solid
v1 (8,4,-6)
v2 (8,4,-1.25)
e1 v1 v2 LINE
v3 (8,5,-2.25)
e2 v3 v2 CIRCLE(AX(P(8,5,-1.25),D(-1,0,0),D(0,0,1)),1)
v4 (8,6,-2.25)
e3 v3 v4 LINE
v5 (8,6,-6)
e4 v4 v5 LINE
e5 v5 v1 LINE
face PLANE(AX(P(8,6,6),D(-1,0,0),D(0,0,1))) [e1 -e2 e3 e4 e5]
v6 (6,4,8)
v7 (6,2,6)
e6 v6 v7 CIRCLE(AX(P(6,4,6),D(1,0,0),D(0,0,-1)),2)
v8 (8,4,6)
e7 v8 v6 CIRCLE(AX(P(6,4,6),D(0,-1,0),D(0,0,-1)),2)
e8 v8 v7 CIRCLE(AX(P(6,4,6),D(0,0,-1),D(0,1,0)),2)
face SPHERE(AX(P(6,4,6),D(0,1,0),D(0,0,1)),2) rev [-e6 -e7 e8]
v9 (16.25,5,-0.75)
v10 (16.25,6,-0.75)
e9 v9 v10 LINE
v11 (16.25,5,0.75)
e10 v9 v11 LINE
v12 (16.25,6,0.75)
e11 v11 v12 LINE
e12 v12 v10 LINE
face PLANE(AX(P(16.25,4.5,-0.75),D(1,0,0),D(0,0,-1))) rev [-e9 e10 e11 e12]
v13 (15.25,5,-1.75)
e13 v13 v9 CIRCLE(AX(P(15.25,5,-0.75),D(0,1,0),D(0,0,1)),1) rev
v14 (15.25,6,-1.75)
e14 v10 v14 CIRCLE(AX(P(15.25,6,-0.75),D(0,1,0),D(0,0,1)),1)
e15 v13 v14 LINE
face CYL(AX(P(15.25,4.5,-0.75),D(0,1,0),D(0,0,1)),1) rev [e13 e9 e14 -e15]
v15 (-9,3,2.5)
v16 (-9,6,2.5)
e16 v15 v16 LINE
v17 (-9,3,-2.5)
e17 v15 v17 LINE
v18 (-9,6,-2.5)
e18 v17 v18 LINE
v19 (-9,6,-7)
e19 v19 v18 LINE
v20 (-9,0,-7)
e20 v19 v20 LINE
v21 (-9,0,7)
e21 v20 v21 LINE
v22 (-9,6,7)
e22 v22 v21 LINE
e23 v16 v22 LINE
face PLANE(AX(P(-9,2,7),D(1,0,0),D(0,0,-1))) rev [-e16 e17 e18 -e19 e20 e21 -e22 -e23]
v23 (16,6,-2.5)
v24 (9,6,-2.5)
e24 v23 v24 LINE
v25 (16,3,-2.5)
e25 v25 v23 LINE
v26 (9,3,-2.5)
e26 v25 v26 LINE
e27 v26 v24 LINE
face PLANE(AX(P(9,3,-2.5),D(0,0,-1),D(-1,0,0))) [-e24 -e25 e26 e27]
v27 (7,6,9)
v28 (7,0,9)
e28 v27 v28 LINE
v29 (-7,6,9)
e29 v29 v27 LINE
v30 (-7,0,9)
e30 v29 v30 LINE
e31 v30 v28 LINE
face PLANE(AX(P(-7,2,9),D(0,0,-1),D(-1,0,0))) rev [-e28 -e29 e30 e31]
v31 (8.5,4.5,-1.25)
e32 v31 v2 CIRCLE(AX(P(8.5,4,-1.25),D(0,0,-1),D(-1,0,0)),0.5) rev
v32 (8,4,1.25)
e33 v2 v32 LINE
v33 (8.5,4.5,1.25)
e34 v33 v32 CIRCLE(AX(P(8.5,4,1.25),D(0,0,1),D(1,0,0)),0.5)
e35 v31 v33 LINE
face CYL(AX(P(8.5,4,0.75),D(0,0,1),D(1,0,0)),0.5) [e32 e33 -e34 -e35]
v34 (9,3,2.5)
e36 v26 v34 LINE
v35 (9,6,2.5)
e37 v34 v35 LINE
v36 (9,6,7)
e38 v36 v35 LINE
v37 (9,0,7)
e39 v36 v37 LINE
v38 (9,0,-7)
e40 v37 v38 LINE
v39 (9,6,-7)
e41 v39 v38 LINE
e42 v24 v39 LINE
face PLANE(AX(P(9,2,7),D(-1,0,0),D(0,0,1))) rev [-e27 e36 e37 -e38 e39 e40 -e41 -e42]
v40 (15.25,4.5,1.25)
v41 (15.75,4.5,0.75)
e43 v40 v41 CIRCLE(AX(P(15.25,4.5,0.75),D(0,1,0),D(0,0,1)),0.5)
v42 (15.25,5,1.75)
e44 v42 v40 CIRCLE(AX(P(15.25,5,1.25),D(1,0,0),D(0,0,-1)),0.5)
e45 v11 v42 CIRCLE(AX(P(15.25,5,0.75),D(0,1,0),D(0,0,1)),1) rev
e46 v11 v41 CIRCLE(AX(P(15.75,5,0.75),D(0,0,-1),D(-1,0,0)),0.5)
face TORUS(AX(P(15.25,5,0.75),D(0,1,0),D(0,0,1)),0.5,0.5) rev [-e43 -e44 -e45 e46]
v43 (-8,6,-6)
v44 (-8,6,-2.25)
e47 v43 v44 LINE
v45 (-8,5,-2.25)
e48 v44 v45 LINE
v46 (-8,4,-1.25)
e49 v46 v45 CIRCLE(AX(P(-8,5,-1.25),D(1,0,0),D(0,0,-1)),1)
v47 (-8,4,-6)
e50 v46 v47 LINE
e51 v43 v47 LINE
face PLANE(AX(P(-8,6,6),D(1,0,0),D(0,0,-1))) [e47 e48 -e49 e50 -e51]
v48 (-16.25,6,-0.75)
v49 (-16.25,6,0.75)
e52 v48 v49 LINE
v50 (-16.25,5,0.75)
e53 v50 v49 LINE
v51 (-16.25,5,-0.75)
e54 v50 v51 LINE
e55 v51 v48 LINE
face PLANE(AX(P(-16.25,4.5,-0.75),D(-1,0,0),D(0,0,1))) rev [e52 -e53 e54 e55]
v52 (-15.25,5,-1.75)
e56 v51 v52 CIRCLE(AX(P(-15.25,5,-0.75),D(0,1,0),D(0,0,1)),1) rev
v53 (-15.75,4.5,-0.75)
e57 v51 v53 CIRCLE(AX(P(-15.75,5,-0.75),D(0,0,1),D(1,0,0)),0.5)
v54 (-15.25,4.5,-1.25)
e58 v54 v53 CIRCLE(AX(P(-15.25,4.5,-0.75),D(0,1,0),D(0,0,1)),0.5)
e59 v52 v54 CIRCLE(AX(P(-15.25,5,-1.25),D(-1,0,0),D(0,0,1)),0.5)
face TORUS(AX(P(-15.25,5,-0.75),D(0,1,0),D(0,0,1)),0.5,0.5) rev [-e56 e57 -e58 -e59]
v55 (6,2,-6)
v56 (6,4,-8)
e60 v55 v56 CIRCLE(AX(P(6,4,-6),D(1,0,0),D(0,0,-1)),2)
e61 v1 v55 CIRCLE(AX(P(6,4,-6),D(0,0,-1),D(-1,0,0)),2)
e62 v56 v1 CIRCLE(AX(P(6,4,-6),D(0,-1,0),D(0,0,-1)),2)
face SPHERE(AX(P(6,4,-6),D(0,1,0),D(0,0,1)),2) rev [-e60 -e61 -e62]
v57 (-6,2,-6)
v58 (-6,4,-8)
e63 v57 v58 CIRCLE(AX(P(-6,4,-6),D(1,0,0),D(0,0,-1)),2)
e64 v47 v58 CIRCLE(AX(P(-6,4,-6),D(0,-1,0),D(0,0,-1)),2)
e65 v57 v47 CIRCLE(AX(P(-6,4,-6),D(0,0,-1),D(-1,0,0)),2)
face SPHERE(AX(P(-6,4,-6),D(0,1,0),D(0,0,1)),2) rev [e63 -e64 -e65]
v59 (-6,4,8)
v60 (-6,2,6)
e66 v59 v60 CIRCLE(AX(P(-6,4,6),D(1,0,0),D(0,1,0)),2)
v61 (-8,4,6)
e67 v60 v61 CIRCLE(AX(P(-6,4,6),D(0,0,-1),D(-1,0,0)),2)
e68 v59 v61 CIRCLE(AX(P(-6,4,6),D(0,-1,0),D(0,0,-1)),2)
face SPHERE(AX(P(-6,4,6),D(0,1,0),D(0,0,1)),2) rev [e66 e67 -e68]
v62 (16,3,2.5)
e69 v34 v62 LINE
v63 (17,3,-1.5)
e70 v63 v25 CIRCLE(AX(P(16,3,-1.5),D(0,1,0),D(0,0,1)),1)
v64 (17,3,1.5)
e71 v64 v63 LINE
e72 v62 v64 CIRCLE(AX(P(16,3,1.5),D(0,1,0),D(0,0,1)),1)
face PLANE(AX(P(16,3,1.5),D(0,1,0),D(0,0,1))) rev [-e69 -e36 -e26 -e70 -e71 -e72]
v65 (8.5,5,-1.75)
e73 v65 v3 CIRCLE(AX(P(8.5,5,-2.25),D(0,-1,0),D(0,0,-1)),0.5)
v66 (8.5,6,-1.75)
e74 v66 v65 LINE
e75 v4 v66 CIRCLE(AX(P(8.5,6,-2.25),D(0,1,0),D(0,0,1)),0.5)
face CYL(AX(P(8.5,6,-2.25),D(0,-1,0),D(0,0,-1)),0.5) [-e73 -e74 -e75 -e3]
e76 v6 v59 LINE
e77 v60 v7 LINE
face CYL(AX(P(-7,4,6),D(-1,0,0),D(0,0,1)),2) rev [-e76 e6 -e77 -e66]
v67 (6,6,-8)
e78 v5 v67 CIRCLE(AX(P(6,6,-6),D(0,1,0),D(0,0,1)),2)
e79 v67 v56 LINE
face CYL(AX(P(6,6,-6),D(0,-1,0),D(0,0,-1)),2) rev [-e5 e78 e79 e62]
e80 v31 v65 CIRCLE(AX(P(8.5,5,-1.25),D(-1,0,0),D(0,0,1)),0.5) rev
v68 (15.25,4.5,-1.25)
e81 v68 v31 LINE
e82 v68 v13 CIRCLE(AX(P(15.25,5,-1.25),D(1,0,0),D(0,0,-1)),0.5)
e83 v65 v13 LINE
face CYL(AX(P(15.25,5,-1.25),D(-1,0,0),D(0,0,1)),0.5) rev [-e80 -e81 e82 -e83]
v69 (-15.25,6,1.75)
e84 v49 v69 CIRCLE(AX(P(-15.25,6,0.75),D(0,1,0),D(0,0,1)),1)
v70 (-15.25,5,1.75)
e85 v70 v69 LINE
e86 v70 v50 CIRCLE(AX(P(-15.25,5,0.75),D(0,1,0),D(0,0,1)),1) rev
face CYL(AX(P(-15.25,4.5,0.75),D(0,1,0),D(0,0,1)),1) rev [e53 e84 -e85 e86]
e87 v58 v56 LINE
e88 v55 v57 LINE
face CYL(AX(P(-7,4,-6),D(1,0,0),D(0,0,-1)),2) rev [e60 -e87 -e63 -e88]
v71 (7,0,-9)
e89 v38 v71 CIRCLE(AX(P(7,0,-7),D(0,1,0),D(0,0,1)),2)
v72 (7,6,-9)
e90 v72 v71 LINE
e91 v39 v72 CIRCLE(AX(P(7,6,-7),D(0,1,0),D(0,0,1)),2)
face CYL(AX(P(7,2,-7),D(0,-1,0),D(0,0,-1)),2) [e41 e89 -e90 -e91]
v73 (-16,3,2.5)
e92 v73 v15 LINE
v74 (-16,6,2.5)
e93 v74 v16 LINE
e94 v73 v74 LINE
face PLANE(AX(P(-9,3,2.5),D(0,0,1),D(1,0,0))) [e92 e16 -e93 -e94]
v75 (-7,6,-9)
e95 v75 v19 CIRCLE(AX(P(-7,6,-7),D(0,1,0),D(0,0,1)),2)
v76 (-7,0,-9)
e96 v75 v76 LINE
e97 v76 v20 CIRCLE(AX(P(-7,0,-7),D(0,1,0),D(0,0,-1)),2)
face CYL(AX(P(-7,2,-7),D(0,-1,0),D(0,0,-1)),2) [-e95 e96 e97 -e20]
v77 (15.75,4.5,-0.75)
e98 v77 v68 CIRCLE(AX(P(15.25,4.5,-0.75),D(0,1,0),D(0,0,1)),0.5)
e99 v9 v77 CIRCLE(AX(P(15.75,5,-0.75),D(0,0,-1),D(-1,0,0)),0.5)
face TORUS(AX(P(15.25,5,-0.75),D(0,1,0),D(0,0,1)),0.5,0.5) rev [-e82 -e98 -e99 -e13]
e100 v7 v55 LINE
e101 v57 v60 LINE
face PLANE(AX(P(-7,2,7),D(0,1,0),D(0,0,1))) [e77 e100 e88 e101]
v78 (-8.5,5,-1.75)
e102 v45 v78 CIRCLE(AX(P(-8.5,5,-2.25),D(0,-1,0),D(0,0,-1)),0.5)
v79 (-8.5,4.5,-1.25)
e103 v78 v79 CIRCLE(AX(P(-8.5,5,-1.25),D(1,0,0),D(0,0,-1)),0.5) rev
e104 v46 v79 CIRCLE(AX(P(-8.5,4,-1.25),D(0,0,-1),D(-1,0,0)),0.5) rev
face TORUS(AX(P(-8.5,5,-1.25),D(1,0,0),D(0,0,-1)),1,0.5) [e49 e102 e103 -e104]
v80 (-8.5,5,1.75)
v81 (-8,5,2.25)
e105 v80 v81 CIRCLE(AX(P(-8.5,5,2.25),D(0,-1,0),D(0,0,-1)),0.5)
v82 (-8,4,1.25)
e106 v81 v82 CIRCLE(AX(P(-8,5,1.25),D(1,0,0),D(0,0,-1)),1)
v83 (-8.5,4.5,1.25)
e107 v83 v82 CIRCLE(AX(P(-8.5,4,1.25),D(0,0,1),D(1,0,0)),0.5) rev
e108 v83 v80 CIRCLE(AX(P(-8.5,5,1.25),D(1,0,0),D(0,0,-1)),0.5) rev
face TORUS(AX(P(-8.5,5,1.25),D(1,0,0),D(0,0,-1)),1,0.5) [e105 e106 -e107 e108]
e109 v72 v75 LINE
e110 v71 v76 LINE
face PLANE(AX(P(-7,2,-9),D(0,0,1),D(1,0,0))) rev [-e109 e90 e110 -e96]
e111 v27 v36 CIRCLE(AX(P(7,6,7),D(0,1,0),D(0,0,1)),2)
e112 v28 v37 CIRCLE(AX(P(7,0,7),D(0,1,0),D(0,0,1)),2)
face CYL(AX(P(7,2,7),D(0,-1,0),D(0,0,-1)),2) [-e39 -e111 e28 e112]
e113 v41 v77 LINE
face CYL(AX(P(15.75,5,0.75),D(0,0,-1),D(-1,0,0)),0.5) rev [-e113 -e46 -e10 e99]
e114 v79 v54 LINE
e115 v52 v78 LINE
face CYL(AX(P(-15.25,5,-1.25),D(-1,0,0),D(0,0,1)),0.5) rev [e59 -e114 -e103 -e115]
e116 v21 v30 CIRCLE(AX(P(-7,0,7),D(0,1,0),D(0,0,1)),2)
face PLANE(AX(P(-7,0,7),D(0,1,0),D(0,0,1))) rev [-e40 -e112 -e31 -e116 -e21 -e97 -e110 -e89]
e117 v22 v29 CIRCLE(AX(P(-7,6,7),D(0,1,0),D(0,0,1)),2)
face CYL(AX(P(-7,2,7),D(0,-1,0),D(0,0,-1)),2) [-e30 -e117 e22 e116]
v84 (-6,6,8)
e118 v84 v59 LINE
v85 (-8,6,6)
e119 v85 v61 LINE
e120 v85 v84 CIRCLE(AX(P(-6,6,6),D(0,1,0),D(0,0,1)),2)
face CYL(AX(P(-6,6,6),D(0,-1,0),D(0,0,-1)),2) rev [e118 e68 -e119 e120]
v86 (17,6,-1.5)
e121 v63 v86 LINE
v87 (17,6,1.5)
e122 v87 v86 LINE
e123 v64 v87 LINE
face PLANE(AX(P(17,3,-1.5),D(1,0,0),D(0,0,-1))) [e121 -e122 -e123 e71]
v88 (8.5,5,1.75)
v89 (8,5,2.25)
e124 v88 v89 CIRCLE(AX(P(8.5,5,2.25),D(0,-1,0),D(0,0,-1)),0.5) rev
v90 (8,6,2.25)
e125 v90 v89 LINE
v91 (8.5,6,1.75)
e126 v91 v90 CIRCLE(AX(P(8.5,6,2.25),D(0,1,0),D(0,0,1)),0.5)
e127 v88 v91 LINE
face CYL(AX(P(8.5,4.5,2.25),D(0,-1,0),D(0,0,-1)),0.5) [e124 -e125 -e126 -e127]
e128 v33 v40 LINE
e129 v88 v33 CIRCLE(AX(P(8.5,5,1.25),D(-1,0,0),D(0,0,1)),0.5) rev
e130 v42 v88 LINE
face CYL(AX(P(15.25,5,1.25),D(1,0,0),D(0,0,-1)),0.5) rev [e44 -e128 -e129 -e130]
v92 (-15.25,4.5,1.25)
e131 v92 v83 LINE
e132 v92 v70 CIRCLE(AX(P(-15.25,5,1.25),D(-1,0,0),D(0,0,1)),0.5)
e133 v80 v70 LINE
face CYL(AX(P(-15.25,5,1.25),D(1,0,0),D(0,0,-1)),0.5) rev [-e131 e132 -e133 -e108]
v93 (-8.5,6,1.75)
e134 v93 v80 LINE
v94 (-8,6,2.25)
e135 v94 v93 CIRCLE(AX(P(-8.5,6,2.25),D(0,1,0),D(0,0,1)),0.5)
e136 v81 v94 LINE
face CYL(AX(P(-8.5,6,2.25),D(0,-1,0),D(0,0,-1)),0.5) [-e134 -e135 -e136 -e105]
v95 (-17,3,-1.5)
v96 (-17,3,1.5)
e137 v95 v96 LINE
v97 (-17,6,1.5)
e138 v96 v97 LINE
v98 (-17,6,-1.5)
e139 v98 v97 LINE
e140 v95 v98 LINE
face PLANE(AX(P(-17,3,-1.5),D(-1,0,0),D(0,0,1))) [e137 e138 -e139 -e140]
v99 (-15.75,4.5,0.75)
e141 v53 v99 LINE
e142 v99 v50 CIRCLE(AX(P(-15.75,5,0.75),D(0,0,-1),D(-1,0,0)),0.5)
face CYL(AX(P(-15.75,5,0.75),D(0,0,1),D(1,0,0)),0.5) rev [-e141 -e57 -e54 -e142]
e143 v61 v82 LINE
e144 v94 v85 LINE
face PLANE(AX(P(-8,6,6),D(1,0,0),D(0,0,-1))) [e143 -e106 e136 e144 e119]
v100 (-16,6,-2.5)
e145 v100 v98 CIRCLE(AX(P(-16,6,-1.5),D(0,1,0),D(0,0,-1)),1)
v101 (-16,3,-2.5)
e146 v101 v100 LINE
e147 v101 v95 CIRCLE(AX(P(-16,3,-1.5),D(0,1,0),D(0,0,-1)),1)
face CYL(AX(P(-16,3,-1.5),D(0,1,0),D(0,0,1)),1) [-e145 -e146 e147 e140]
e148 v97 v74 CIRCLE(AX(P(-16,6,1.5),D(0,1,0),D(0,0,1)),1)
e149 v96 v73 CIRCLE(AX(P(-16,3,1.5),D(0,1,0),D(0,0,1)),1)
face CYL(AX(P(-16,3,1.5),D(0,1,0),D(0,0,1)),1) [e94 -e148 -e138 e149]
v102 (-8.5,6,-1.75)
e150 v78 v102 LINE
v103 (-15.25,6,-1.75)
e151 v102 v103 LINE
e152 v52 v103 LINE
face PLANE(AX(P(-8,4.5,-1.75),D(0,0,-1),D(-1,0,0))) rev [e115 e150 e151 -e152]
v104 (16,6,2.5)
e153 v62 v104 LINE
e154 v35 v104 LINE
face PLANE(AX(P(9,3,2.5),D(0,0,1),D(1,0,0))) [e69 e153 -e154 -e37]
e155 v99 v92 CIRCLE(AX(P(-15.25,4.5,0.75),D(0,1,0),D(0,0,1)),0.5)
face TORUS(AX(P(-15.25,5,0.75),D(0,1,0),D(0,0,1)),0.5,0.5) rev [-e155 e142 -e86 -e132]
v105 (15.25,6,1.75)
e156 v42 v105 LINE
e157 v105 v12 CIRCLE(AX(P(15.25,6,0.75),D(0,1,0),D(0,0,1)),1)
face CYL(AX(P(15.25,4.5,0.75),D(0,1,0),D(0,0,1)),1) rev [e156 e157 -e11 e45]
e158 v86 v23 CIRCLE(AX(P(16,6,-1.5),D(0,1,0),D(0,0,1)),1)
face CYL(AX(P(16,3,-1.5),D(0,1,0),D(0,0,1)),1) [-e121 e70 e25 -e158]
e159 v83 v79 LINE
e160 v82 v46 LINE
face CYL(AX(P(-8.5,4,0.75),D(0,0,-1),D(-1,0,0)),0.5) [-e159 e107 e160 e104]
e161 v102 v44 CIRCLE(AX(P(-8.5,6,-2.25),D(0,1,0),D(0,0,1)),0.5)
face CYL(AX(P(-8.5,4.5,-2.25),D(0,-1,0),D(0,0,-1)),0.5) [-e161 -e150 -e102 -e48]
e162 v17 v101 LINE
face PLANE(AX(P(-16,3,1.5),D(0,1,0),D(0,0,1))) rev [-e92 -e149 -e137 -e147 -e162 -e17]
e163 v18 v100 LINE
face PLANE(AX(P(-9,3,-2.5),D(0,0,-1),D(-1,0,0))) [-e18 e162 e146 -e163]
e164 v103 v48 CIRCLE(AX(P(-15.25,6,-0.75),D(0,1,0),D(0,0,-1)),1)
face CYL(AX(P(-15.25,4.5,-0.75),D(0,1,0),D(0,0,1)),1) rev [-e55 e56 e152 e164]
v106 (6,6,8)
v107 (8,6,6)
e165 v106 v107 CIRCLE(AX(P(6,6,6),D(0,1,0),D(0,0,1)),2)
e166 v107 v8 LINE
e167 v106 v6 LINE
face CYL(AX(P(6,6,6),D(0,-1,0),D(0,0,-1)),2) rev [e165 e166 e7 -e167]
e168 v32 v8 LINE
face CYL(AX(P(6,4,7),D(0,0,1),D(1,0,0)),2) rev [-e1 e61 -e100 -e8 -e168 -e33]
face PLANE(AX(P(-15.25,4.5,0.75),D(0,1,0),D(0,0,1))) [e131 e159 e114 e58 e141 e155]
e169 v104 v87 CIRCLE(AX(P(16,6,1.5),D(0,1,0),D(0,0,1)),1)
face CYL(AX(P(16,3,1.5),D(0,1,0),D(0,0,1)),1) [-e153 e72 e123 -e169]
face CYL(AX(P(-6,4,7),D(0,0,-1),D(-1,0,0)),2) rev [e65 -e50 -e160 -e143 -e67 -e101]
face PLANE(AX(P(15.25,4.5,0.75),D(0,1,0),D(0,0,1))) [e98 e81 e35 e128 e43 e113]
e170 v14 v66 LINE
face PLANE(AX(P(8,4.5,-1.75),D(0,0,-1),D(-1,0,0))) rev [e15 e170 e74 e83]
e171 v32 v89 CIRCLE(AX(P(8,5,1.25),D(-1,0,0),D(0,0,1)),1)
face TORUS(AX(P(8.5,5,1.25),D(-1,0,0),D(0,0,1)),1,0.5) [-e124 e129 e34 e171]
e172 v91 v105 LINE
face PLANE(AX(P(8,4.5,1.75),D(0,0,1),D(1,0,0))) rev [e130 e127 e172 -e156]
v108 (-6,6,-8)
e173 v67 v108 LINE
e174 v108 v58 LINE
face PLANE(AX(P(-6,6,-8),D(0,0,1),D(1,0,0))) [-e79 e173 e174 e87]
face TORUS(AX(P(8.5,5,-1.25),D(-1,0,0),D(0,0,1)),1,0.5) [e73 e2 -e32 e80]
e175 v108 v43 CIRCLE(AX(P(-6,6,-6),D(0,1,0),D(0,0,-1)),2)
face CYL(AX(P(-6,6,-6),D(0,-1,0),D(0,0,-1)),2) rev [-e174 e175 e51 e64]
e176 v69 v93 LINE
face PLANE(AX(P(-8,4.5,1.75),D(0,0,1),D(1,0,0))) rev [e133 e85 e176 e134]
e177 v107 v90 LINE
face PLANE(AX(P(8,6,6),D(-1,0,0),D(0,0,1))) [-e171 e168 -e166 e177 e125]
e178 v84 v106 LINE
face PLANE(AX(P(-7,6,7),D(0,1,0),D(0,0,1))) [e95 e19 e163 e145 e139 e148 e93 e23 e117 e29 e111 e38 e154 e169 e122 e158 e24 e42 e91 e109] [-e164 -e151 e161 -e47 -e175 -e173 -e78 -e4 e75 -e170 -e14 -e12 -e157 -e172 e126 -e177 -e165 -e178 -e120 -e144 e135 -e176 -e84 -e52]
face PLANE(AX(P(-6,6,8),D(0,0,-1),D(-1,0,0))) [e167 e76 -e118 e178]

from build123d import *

# Parameters (mm, degrees)
BOSS_EXTRUDE1_DEPTH = 2
BOSS_EXTRUDE2_DEPTH = 4
FILLET1_R           = 2
BOSS_EXTRUDE3_DEPTH = 3
CUT_EXTRUDE1_DEPTH  = 1.5
FILLET2_R           = 0.5


with BuildPart() as part:
    # Sketch1 → Boss-Extrude1 (new body)
    with BuildSketch(Plane(origin=(0, 0, 0), x_dir=(1, 0, 0), z_dir=(0, 1, 0))):
        with BuildLine():
            Line((-7, -9), (7, -9))
            ThreePointArc((7, -9), (8.414213562, -8.414213562), (9, -7))
            Line((9, -7), (9, 7))
            ThreePointArc((9, 7), (8.414213562, 8.414213562), (7, 9))
            Line((7, 9), (-7, 9))
            ThreePointArc((-7, 9), (-8.414213562, 8.414213562), (-9, 7))
            Line((-9, 7), (-9, -7))
            ThreePointArc((-9, -7), (-8.414213562, -8.414213562), (-7, -9))
        make_face()
    extrude(amount=BOSS_EXTRUDE1_DEPTH)

    # Sketch2 → Boss-Extrude2 (add)
    with BuildSketch(Plane(origin=(0, 2, 0), x_dir=(1, 0, 0), z_dir=(0, 1, 0))):
        with BuildLine():
            Line((-7, -9), (7, -9))
            ThreePointArc((7, -9), (8.414213562, -8.414213562), (9, -7))
            Line((9, -7), (9, 7))
            ThreePointArc((9, 7), (8.414213562, 8.414213562), (7, 9))
            Line((7, 9), (-7, 9))
            ThreePointArc((-7, 9), (-8.414213562, 8.414213562), (-9, 7))
            Line((-9, 7), (-9, -7))
            ThreePointArc((-9, -7), (-8.414213562, -8.414213562), (-7, -9))
        make_face()
        with BuildLine():
            Line((-6, -8), (6, -8))
            ThreePointArc((6, -8), (7.414213562, -7.414213562), (8, -6))
            Line((8, -6), (8, 6))
            ThreePointArc((8, 6), (7.414213562, 7.414213562), (6, 8))
            Line((6, 8), (-6, 8))
            ThreePointArc((-6, 8), (-7.414213562, 7.414213562), (-8, 6))
            Line((-8, 6), (-8, -6))
            ThreePointArc((-8, -6), (-7.414213562, -7.414213562), (-6, -8))
        make_face(mode=Mode.SUBTRACT)
    extrude(amount=BOSS_EXTRUDE2_DEPTH)

    # Fillet1
    fillet1_edges = [part.edges().sort_by_distance(p)[0] for p in [
        (-7.414213562, 2, 7.414213562),
        (0, 2, 8),
        (7.414213562, 2, 7.414213562),
        (8, 2, 0),
        (7.414213562, 2, -7.414213562),
        (0, 2, -8),
        (-7.414213562, 2, -7.414213562),
        (-8, 2, 0),
    ]]
    fillet(fillet1_edges, radius=FILLET1_R)

    # Sketch3 → Boss-Extrude3 (add)
    with BuildSketch(Plane(origin=(0, 6, 0), x_dir=(1, 0, 0), z_dir=(0, 1, 0))):
        with BuildLine():
            Line((-9, 2.5), (-16, 2.5))
            ThreePointArc((-16, 2.5), (-16.707106781, 2.207106781), (-17, 1.5))
            Line((-17, 1.5), (-17, -1.5))
            ThreePointArc((-17, -1.5), (-16.707106781, -2.207106781), (-16, -2.5))
            Line((-16, -2.5), (-9, -2.5))
            Line((-9, -2.5), (-9, 2.5))
        make_face()
        with BuildLine():
            Line((9, 2.5), (16, 2.5))
            ThreePointArc((16, 2.5), (16.707106781, 2.207106781), (17, 1.5))
            Line((17, 1.5), (17, -1.5))
            ThreePointArc((17, -1.5), (16.707106781, -2.207106781), (16, -2.5))
            Line((16, -2.5), (9, -2.5))
            Line((9, -2.5), (9, 2.5))
        make_face()
    extrude(amount=-BOSS_EXTRUDE3_DEPTH)

    # Sketch4 → Cut-Extrude1 (cut)
    with BuildSketch(Plane(origin=(0, 6, 0), x_dir=(1, 0, 0), z_dir=(0, 1, 0))):
        with BuildLine():
            Line((-8, 1.75), (-15.25, 1.75))
            ThreePointArc((-15.25, 1.75), (-15.957106781, 1.457106781), (-16.25, 0.75))
            Line((-16.25, 0.75), (-16.25, -0.75))
            ThreePointArc((-16.25, -0.75), (-15.957106781, -1.457106781), (-15.25, -1.75))
            Line((-15.25, -1.75), (-8, -1.75))
            Line((-8, -1.75), (-8, 1.75))
        make_face()
        with BuildLine():
            Line((8, 1.75), (15.25, 1.75))
            ThreePointArc((15.25, 1.75), (15.957106781, 1.457106781), (16.25, 0.75))
            Line((16.25, 0.75), (16.25, -0.75))
            ThreePointArc((16.25, -0.75), (15.957106781, -1.457106781), (15.25, -1.75))
            Line((15.25, -1.75), (8, -1.75))
            Line((8, -1.75), (8, 1.75))
        make_face()
    extrude(amount=-CUT_EXTRUDE1_DEPTH, mode=Mode.SUBTRACT)

    # Fillet2
    fillet2_edges = [part.edges().sort_by_distance(p)[0] for p in [
        (-8, 4.5, 0),
        (-8, 5.25, -1.75),
        (-11.625, 4.5, 1.75),
        (-8, 5.25, 1.75),
        (-15.957106781, 4.5, 1.457106781),
        (-16.25, 4.5, 0),
        (-15.957106781, 4.5, -1.457106781),
        (-11.625, 4.5, -1.75),
        (8, 4.5, 0),
        (8, 5.25, 1.75),
        (11.625, 4.5, -1.75),
        (8, 5.25, -1.75),
        (15.957106781, 4.5, -1.457106781),
        (16.25, 4.5, 0),
        (15.957106781, 4.5, 1.457106781),
        (11.625, 4.5, 1.75),
    ]]
    fillet(fillet2_edges, radius=FILLET2_R - 0.0001)  # a hair under: the kernel refuses the full size


solid = part.part
